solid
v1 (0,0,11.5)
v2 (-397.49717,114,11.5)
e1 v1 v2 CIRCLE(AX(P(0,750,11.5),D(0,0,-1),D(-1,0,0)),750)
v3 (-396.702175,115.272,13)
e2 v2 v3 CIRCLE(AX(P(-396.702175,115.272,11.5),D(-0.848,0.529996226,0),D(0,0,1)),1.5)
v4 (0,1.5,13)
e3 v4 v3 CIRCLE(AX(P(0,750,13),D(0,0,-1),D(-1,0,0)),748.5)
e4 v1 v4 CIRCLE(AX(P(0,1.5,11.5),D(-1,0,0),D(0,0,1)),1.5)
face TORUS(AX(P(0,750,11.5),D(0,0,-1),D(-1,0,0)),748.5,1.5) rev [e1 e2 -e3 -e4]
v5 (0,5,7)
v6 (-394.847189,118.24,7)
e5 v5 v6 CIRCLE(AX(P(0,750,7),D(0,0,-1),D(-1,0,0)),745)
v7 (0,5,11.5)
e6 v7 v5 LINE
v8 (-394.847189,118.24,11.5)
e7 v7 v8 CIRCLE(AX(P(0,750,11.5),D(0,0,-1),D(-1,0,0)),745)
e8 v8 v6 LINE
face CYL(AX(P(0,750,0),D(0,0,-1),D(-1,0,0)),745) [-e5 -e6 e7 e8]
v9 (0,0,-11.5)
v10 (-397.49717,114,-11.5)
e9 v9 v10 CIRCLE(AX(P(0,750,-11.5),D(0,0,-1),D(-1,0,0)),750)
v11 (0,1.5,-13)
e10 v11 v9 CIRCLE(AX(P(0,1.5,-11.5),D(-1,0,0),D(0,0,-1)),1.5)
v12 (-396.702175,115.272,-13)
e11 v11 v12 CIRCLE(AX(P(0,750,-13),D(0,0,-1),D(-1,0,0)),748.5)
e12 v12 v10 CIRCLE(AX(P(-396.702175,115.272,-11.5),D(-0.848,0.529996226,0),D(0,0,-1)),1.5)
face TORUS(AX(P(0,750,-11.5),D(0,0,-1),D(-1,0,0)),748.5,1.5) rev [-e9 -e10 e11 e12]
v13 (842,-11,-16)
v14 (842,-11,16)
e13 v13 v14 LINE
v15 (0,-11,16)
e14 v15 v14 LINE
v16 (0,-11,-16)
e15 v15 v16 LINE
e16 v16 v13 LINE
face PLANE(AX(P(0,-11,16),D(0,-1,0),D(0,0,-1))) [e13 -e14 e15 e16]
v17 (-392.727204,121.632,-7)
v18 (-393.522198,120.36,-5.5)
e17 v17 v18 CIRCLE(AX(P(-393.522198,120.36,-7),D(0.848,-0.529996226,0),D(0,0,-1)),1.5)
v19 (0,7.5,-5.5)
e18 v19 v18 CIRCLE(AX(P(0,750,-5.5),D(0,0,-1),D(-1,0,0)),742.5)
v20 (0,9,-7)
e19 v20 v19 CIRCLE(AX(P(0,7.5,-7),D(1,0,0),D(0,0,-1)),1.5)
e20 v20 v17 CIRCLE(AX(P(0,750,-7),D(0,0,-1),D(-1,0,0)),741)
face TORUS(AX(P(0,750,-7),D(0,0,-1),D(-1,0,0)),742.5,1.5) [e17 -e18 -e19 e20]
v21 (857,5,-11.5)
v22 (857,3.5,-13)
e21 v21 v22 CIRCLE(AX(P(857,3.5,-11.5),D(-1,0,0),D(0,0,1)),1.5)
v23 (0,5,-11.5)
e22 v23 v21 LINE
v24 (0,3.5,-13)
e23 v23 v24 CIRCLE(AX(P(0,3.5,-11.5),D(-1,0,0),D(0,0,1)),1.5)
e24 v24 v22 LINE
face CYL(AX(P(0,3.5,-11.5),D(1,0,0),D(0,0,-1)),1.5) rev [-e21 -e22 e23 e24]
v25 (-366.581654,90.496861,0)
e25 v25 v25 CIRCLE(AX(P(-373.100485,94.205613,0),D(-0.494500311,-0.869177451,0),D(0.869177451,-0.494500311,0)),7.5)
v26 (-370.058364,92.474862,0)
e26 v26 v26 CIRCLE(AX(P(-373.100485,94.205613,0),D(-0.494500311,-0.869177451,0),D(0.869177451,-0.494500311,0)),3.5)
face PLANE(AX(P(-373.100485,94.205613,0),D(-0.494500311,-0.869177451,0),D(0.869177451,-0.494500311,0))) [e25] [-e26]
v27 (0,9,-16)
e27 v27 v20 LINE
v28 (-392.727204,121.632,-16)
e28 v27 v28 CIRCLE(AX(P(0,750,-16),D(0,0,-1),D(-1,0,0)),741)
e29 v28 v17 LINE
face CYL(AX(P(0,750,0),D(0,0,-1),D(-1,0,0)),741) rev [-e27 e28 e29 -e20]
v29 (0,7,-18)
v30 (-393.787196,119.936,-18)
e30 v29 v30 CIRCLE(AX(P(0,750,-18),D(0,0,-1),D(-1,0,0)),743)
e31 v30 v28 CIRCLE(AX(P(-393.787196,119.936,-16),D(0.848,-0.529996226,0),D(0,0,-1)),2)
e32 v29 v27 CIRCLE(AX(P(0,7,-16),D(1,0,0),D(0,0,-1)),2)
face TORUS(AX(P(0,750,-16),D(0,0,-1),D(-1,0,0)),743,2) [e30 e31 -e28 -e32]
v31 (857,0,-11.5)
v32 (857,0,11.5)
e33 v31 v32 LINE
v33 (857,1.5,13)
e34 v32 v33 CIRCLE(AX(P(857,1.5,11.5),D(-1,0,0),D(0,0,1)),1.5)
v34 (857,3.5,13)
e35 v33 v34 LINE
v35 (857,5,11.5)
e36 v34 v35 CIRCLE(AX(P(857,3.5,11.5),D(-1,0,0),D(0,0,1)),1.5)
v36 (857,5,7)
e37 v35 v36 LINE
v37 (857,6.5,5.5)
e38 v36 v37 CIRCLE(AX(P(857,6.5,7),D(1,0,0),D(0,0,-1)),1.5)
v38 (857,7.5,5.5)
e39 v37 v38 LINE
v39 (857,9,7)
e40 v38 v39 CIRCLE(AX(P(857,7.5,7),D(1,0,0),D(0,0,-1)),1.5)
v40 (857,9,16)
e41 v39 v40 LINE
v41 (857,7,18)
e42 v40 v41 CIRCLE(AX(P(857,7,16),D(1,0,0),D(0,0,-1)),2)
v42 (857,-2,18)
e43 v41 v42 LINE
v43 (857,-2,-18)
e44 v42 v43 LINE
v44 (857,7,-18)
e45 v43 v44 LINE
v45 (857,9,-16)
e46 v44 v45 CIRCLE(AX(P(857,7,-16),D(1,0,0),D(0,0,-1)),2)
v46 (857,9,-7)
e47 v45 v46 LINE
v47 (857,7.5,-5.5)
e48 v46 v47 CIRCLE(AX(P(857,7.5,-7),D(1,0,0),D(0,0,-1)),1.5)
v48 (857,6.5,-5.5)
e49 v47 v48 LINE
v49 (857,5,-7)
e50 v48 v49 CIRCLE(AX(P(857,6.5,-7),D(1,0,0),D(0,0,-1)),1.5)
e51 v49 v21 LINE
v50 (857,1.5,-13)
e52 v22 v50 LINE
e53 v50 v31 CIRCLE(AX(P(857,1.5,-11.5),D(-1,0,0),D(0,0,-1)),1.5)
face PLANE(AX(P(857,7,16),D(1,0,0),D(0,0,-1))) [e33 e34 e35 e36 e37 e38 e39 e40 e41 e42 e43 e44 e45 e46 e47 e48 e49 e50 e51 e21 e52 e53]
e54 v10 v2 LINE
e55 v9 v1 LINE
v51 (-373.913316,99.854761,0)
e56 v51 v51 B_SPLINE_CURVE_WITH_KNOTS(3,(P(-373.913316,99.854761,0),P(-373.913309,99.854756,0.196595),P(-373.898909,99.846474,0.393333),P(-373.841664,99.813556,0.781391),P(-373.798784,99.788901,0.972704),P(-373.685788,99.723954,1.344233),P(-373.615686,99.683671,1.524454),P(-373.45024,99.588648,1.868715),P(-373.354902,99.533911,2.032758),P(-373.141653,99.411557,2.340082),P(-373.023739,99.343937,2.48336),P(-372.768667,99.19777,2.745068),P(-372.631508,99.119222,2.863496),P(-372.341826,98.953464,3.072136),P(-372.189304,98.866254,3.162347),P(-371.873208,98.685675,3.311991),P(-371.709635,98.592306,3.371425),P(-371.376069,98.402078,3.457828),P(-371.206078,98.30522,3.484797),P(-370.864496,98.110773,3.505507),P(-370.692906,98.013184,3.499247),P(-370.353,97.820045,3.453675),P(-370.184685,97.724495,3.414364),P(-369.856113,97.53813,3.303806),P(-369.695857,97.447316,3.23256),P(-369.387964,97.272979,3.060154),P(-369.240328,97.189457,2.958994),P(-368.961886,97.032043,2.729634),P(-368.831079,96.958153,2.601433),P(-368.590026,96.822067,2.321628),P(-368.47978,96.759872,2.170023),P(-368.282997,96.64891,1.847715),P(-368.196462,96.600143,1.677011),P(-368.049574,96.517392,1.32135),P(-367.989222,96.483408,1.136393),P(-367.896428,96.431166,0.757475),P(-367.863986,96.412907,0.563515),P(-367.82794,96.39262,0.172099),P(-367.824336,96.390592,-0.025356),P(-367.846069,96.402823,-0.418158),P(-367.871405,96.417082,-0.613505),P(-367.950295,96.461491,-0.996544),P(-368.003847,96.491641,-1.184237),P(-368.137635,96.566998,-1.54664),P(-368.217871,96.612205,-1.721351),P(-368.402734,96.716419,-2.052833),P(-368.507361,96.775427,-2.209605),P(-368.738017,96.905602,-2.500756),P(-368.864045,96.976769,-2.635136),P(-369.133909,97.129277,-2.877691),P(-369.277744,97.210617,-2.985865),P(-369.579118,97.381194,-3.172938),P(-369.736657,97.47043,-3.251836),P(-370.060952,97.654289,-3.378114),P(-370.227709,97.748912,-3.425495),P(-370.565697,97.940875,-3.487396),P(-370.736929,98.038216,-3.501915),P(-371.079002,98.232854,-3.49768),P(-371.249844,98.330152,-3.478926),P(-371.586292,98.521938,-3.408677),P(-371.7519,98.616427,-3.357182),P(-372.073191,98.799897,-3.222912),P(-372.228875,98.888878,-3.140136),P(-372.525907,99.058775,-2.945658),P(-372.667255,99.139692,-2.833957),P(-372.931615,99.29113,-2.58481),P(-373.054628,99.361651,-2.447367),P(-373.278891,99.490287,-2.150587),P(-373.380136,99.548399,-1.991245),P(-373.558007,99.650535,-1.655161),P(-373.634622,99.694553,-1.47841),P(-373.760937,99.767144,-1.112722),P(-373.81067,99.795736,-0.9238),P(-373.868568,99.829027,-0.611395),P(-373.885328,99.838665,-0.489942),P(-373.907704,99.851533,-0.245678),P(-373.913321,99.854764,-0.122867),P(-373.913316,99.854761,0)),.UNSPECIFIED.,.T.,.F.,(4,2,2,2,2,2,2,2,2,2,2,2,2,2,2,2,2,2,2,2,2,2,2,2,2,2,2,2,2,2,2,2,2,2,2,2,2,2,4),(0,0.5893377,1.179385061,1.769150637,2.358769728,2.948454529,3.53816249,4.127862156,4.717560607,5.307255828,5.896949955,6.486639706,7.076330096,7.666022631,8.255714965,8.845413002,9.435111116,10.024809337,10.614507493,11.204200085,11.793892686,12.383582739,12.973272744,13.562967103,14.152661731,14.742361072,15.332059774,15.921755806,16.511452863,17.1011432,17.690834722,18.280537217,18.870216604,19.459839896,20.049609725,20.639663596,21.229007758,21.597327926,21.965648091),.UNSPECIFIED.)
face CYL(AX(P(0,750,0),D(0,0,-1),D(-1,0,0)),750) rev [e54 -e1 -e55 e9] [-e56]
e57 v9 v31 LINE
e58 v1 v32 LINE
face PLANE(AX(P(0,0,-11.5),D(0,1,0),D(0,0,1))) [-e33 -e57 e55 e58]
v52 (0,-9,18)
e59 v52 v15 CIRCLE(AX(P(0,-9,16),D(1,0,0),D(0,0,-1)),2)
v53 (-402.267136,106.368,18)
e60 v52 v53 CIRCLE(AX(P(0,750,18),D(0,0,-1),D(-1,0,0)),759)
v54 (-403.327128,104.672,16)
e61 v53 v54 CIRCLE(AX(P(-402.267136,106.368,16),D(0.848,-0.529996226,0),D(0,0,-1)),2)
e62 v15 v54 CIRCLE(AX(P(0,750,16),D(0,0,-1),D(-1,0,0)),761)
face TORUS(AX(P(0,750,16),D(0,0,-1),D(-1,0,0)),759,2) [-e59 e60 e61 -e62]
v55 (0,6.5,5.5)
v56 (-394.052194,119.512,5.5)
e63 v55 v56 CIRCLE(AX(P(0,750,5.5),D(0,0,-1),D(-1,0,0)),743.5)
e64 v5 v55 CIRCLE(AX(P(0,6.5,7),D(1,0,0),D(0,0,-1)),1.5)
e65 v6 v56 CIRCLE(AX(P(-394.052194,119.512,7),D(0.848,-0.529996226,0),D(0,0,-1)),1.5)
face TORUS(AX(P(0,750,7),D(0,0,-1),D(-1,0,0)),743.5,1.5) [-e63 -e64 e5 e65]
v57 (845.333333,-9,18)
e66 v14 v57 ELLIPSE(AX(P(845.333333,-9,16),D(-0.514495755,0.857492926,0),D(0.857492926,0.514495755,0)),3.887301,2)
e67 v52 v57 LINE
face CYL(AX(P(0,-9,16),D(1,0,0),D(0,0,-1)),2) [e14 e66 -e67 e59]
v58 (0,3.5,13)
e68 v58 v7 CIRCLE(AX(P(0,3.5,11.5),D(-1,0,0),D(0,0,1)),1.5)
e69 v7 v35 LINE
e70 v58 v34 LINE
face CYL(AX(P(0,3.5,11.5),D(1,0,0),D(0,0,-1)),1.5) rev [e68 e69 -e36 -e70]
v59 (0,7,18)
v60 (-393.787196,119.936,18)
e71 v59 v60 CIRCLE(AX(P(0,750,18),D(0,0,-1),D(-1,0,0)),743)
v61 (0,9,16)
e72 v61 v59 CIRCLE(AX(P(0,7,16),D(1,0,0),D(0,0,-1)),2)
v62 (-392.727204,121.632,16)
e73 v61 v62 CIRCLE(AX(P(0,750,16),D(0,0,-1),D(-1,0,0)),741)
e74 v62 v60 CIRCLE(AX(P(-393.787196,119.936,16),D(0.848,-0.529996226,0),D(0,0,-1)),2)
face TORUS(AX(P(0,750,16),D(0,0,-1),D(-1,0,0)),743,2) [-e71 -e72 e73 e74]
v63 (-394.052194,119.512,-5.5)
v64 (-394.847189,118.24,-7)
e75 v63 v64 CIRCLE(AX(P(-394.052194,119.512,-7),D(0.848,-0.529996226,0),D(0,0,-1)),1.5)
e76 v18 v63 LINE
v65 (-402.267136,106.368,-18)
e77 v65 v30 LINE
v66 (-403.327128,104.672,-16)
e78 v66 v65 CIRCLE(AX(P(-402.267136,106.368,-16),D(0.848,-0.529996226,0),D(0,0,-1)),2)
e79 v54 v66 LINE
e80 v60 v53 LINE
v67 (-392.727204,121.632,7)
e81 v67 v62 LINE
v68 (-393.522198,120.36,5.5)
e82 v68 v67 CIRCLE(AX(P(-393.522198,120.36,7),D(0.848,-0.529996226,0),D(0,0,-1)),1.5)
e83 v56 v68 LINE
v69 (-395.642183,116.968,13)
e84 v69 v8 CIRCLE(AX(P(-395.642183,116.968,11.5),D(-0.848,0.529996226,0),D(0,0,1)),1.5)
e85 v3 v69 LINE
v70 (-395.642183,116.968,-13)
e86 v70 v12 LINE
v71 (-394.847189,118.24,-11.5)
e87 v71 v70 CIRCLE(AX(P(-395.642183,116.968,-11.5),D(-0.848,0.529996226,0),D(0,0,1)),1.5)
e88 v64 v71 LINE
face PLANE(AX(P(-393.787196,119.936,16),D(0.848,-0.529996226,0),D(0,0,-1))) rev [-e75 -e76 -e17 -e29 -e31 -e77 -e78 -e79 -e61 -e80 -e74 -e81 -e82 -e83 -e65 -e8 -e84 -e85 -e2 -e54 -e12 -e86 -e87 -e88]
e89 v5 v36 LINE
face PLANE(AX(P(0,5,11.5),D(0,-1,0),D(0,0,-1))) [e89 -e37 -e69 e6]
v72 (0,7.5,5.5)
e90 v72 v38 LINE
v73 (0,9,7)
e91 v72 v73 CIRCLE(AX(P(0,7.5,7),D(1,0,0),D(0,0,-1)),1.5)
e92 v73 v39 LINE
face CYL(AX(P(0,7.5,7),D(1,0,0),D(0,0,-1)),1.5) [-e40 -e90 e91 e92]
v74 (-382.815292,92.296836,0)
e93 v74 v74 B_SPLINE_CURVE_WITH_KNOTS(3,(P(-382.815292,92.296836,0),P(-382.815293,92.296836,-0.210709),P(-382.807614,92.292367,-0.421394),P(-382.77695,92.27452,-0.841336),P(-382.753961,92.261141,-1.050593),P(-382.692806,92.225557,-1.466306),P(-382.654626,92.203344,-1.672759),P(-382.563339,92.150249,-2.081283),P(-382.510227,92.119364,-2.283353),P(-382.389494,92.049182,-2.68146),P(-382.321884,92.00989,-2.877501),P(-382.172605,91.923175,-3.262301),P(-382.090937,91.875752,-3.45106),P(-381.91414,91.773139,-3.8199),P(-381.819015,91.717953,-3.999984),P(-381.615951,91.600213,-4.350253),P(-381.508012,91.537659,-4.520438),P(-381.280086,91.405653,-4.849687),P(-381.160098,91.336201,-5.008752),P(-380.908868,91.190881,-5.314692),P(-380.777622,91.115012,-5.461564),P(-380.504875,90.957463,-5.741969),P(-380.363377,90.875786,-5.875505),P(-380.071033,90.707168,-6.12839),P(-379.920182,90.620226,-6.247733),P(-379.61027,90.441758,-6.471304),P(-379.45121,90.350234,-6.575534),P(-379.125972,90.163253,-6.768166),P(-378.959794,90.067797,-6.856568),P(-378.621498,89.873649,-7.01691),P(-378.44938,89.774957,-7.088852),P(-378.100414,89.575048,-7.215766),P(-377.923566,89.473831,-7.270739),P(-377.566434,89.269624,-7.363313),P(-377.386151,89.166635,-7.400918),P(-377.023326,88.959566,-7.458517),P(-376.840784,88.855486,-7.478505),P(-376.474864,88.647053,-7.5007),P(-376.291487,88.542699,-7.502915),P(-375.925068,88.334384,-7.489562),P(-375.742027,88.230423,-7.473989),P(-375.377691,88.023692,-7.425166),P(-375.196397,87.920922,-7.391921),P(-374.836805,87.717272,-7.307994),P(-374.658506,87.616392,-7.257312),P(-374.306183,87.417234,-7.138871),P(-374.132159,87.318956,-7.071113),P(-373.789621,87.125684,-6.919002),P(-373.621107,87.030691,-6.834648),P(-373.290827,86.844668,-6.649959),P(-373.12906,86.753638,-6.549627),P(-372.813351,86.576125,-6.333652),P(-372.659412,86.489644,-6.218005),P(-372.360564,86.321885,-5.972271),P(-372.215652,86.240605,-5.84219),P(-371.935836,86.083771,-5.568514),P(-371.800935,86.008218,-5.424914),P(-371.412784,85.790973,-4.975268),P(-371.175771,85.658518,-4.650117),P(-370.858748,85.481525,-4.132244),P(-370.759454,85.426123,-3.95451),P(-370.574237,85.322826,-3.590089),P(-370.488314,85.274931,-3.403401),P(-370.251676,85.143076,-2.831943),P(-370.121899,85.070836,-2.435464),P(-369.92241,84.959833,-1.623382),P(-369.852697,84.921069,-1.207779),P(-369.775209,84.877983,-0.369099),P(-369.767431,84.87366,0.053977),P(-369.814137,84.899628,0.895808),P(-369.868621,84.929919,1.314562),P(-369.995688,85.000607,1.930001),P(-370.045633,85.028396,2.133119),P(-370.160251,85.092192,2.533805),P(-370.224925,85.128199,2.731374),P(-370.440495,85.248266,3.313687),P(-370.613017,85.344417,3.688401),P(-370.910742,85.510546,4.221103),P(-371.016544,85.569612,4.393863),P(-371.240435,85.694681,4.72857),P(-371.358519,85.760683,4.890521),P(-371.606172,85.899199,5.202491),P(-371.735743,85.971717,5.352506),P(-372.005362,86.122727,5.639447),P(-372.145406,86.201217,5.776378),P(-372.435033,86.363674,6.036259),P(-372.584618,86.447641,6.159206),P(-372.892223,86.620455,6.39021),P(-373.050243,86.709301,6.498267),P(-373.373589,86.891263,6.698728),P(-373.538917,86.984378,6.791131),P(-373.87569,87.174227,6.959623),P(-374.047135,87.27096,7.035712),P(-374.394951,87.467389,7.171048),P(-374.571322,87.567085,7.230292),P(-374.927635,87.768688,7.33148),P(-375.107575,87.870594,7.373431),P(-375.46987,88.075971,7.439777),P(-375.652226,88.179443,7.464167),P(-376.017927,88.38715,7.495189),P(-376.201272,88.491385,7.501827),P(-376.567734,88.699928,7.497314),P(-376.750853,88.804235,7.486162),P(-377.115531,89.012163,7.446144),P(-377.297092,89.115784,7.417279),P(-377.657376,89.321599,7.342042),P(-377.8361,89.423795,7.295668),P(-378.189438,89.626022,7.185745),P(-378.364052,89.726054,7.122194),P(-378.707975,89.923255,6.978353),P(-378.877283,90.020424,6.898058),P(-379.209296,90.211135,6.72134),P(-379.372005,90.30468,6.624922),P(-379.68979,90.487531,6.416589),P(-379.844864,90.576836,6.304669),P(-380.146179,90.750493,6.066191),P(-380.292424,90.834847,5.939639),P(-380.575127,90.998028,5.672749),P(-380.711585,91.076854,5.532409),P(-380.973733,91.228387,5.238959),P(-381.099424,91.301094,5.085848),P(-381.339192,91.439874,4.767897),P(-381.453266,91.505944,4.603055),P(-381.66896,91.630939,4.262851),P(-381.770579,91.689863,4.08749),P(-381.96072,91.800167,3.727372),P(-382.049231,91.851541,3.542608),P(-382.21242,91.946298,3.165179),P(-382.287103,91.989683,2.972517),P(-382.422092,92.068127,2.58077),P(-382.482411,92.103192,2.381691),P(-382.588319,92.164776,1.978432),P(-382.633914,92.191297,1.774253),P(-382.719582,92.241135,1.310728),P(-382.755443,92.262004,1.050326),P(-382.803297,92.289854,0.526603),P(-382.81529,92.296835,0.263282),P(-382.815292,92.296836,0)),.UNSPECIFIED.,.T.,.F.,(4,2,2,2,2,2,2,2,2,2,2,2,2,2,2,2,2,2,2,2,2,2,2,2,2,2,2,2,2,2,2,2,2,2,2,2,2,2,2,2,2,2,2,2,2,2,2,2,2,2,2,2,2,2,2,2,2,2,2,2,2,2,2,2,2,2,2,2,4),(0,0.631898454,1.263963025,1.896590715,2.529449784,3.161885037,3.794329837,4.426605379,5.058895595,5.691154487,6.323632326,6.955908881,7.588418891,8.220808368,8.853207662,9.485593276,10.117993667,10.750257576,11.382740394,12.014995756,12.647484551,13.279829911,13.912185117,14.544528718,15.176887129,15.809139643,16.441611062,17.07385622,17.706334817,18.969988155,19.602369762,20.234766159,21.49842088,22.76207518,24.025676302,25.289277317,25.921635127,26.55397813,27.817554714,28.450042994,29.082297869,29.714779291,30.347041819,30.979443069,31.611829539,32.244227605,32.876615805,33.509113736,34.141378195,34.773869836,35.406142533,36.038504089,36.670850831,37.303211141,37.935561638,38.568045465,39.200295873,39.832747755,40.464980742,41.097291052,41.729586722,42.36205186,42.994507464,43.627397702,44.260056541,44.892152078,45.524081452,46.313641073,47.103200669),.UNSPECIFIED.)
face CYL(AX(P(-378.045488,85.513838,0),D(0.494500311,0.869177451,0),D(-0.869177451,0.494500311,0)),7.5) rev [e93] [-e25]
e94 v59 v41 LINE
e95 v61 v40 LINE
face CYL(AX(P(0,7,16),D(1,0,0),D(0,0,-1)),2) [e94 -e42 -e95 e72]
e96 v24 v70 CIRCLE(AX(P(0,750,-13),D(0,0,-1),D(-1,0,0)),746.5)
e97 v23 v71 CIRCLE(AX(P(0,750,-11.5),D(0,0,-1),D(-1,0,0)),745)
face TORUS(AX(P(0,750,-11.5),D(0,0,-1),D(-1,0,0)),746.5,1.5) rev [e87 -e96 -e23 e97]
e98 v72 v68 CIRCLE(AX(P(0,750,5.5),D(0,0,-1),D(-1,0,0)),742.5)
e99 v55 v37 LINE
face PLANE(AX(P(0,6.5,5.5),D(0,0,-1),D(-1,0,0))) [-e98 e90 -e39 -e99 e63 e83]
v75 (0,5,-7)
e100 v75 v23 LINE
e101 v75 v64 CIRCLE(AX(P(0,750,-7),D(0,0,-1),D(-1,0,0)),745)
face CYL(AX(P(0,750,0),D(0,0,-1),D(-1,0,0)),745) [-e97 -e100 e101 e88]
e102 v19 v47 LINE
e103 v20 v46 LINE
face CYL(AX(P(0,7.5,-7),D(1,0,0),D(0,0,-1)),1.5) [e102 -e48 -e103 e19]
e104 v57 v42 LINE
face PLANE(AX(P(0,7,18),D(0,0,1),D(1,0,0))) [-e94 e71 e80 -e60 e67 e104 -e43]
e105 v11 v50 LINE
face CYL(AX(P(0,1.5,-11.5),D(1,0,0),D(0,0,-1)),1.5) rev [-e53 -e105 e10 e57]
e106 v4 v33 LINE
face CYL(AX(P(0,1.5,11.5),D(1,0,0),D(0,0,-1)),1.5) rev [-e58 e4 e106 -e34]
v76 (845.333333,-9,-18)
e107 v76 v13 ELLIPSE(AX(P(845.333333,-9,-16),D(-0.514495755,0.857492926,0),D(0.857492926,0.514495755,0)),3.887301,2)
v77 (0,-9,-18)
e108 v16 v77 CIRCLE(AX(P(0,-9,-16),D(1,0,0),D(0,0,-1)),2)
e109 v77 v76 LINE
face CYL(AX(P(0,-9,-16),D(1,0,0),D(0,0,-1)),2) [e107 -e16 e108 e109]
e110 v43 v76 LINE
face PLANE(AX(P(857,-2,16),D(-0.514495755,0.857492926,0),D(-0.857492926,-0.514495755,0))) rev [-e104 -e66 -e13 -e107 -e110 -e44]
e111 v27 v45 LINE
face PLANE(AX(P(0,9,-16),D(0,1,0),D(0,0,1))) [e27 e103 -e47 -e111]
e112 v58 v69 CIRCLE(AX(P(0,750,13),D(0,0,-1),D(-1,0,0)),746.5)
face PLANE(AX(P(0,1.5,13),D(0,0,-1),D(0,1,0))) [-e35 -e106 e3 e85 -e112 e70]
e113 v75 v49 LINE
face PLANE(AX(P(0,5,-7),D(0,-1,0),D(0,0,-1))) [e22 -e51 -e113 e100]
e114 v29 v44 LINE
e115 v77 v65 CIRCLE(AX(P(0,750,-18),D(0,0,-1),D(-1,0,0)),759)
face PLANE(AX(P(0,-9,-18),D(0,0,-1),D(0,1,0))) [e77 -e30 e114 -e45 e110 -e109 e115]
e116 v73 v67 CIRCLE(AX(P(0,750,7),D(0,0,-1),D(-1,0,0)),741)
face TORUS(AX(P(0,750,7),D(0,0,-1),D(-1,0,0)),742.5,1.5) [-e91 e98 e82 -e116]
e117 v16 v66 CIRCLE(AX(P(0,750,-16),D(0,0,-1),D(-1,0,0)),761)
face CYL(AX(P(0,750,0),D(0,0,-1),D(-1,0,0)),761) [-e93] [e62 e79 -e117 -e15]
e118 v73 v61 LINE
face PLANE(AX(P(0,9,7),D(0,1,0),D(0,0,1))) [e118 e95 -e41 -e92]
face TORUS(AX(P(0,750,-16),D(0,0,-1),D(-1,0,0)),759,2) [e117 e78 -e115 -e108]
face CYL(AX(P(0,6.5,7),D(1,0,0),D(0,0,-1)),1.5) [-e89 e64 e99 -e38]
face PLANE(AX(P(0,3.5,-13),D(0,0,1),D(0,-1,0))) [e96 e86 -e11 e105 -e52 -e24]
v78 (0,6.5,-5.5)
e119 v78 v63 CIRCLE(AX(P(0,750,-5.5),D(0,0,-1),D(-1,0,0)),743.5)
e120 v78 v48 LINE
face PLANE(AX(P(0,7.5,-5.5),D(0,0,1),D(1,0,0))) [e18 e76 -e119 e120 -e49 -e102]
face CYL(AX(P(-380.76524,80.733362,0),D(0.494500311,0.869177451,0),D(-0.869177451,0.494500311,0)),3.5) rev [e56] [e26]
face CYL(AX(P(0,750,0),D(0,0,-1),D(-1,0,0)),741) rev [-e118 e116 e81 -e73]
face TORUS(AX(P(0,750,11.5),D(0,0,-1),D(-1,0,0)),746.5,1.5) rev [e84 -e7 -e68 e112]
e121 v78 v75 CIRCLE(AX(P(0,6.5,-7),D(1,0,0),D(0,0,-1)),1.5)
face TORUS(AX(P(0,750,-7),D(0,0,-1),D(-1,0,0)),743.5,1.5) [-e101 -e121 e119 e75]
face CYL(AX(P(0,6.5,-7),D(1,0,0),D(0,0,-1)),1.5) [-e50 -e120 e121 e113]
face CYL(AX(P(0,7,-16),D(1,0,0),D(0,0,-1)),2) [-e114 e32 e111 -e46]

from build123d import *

# Parameters (mm, degrees)
CHAMFER_1_SIZE           = 15
CHAMFER_1_SIZE_2         = 9
CUT_EXTRUDE_1_DEPTH      = 20
CUT_EXTRUDE_1_DEPTH_BACK = 20
SKETCH_3_R               = 3.5
SKETCH_4_R               = 7.5
CUT_EXTRUDE_2_DEPTH      = 10


with BuildPart() as part:
    # По траектории1: sweep along a path in Эскиз1
    with BuildLine(Plane.XY) as sweep_1_path:
        Line((857, 0), (0, 0))
        ThreePointArc((0, 0), (-206.760731281, 29.063109558), (-397.497169801, 114))
    # Эскиз2 → По траектории1 (sweep)
    with BuildSketch(Plane(origin=(857, 0, 0), x_dir=(0, 0, -1), z_dir=(1, 0, 0))):
        with BuildLine():
            Line((11.5, 0), (-11.5, 0))
            ThreePointArc((-11.5, 0), (-12.560660172, 0.439339828), (-13, 1.5))
            Line((-13, 1.5), (-13, 3.5))
            ThreePointArc((-13, 3.5), (-12.560660172, 4.560660172), (-11.5, 5))
            Line((-11.5, 5), (-7, 5))
            ThreePointArc((-7, 5), (-5.939339828, 5.439339828), (-5.5, 6.5))
            Line((-5.5, 6.5), (-5.5, 7.5))
            ThreePointArc((-5.5, 7.5), (-5.939339828, 8.560660172), (-7, 9))
            Line((-7, 9), (-16, 9))
            ThreePointArc((-16, 9), (-17.414213562, 8.414213562), (-18, 7))
            Line((-18, 7), (-18, -9))
            ThreePointArc((-18, -9), (-17.414213562, -10.414213562), (-16, -11))
            Line((-16, -11), (16, -11))
            ThreePointArc((16, -11), (17.414213562, -10.414213562), (18, -9))
            Line((18, -9), (18, 7))
            ThreePointArc((18, 7), (17.414213562, 8.414213562), (16, 9))
            Line((16, 9), (7, 9))
            ThreePointArc((7, 9), (5.939339828, 8.560660172), (5.5, 7.5))
            Line((5.5, 7.5), (5.5, 6.5))
            ThreePointArc((5.5, 6.5), (5.939339828, 5.439339828), (7, 5))
            Line((7, 5), (11.5, 5))
            ThreePointArc((11.5, 5), (12.560660172, 4.560660172), (13, 3.5))
            Line((13, 3.5), (13, 1.5))
            ThreePointArc((13, 1.5), (12.560660172, 0.439339828), (11.5, 0))
        make_face()
    sweep(path=sweep_1_path.line)

    # Фаска1
    # the kernel refuses this chamfer: 15, 9 mm, written as the material it takes off along each edge
    with BuildSketch(Plane(origin=(857, -11, 54.793916458), x_dir=(-0.9998021063601228, -0.019893418958582456, 0), z_dir=(0, 0, -1))) as chamfer_1_piece_1:
        Polygon((CHAMFER_1_SIZE * 0.99980210636, CHAMFER_1_SIZE * 0.0198934189586), (-CHAMFER_1_SIZE_2 * 0.0198934189586, CHAMFER_1_SIZE_2 * 0.99980210636), (0, 0), align=None)
    extrude(amount=109.587832916, mode=Mode.SUBTRACT)

    # Эскиз3 → Вырез-Вытянуть1 (cut, two sides: drawn at the far end of the back side and taken through both)
    with BuildSketch(Plane(origin=(-370.875233434, 98.116911382, 0), x_dir=(0.8691774514901227, -0.4945003112447307, 0), z_dir=(-0.4945003112447307, -0.8691774514901227, 0)).offset(-CUT_EXTRUDE_1_DEPTH_BACK)):
        with Locations(Location((0, 0, 0), (0, 0, 180))):
            Circle(SKETCH_3_R)
    extrude(amount=CUT_EXTRUDE_1_DEPTH + CUT_EXTRUDE_1_DEPTH_BACK, mode=Mode.SUBTRACT)

    # Эскиз4 → Вырез-Вытянуть2 (cut)
    with BuildSketch(Plane(origin=(-50.744094618, -89.192305515, 0), x_dir=(0.8691774514901226, -0.4945003112447307, 0), z_dir=(-0.4945003112447307, -0.8691774514901226, 0))):
        with Locations(Location((-370.875233434, 0, 0), (0, 0, 180))):
            Circle(SKETCH_4_R)
    extrude(amount=CUT_EXTRUDE_2_DEPTH, mode=Mode.SUBTRACT)


solid = part.part
